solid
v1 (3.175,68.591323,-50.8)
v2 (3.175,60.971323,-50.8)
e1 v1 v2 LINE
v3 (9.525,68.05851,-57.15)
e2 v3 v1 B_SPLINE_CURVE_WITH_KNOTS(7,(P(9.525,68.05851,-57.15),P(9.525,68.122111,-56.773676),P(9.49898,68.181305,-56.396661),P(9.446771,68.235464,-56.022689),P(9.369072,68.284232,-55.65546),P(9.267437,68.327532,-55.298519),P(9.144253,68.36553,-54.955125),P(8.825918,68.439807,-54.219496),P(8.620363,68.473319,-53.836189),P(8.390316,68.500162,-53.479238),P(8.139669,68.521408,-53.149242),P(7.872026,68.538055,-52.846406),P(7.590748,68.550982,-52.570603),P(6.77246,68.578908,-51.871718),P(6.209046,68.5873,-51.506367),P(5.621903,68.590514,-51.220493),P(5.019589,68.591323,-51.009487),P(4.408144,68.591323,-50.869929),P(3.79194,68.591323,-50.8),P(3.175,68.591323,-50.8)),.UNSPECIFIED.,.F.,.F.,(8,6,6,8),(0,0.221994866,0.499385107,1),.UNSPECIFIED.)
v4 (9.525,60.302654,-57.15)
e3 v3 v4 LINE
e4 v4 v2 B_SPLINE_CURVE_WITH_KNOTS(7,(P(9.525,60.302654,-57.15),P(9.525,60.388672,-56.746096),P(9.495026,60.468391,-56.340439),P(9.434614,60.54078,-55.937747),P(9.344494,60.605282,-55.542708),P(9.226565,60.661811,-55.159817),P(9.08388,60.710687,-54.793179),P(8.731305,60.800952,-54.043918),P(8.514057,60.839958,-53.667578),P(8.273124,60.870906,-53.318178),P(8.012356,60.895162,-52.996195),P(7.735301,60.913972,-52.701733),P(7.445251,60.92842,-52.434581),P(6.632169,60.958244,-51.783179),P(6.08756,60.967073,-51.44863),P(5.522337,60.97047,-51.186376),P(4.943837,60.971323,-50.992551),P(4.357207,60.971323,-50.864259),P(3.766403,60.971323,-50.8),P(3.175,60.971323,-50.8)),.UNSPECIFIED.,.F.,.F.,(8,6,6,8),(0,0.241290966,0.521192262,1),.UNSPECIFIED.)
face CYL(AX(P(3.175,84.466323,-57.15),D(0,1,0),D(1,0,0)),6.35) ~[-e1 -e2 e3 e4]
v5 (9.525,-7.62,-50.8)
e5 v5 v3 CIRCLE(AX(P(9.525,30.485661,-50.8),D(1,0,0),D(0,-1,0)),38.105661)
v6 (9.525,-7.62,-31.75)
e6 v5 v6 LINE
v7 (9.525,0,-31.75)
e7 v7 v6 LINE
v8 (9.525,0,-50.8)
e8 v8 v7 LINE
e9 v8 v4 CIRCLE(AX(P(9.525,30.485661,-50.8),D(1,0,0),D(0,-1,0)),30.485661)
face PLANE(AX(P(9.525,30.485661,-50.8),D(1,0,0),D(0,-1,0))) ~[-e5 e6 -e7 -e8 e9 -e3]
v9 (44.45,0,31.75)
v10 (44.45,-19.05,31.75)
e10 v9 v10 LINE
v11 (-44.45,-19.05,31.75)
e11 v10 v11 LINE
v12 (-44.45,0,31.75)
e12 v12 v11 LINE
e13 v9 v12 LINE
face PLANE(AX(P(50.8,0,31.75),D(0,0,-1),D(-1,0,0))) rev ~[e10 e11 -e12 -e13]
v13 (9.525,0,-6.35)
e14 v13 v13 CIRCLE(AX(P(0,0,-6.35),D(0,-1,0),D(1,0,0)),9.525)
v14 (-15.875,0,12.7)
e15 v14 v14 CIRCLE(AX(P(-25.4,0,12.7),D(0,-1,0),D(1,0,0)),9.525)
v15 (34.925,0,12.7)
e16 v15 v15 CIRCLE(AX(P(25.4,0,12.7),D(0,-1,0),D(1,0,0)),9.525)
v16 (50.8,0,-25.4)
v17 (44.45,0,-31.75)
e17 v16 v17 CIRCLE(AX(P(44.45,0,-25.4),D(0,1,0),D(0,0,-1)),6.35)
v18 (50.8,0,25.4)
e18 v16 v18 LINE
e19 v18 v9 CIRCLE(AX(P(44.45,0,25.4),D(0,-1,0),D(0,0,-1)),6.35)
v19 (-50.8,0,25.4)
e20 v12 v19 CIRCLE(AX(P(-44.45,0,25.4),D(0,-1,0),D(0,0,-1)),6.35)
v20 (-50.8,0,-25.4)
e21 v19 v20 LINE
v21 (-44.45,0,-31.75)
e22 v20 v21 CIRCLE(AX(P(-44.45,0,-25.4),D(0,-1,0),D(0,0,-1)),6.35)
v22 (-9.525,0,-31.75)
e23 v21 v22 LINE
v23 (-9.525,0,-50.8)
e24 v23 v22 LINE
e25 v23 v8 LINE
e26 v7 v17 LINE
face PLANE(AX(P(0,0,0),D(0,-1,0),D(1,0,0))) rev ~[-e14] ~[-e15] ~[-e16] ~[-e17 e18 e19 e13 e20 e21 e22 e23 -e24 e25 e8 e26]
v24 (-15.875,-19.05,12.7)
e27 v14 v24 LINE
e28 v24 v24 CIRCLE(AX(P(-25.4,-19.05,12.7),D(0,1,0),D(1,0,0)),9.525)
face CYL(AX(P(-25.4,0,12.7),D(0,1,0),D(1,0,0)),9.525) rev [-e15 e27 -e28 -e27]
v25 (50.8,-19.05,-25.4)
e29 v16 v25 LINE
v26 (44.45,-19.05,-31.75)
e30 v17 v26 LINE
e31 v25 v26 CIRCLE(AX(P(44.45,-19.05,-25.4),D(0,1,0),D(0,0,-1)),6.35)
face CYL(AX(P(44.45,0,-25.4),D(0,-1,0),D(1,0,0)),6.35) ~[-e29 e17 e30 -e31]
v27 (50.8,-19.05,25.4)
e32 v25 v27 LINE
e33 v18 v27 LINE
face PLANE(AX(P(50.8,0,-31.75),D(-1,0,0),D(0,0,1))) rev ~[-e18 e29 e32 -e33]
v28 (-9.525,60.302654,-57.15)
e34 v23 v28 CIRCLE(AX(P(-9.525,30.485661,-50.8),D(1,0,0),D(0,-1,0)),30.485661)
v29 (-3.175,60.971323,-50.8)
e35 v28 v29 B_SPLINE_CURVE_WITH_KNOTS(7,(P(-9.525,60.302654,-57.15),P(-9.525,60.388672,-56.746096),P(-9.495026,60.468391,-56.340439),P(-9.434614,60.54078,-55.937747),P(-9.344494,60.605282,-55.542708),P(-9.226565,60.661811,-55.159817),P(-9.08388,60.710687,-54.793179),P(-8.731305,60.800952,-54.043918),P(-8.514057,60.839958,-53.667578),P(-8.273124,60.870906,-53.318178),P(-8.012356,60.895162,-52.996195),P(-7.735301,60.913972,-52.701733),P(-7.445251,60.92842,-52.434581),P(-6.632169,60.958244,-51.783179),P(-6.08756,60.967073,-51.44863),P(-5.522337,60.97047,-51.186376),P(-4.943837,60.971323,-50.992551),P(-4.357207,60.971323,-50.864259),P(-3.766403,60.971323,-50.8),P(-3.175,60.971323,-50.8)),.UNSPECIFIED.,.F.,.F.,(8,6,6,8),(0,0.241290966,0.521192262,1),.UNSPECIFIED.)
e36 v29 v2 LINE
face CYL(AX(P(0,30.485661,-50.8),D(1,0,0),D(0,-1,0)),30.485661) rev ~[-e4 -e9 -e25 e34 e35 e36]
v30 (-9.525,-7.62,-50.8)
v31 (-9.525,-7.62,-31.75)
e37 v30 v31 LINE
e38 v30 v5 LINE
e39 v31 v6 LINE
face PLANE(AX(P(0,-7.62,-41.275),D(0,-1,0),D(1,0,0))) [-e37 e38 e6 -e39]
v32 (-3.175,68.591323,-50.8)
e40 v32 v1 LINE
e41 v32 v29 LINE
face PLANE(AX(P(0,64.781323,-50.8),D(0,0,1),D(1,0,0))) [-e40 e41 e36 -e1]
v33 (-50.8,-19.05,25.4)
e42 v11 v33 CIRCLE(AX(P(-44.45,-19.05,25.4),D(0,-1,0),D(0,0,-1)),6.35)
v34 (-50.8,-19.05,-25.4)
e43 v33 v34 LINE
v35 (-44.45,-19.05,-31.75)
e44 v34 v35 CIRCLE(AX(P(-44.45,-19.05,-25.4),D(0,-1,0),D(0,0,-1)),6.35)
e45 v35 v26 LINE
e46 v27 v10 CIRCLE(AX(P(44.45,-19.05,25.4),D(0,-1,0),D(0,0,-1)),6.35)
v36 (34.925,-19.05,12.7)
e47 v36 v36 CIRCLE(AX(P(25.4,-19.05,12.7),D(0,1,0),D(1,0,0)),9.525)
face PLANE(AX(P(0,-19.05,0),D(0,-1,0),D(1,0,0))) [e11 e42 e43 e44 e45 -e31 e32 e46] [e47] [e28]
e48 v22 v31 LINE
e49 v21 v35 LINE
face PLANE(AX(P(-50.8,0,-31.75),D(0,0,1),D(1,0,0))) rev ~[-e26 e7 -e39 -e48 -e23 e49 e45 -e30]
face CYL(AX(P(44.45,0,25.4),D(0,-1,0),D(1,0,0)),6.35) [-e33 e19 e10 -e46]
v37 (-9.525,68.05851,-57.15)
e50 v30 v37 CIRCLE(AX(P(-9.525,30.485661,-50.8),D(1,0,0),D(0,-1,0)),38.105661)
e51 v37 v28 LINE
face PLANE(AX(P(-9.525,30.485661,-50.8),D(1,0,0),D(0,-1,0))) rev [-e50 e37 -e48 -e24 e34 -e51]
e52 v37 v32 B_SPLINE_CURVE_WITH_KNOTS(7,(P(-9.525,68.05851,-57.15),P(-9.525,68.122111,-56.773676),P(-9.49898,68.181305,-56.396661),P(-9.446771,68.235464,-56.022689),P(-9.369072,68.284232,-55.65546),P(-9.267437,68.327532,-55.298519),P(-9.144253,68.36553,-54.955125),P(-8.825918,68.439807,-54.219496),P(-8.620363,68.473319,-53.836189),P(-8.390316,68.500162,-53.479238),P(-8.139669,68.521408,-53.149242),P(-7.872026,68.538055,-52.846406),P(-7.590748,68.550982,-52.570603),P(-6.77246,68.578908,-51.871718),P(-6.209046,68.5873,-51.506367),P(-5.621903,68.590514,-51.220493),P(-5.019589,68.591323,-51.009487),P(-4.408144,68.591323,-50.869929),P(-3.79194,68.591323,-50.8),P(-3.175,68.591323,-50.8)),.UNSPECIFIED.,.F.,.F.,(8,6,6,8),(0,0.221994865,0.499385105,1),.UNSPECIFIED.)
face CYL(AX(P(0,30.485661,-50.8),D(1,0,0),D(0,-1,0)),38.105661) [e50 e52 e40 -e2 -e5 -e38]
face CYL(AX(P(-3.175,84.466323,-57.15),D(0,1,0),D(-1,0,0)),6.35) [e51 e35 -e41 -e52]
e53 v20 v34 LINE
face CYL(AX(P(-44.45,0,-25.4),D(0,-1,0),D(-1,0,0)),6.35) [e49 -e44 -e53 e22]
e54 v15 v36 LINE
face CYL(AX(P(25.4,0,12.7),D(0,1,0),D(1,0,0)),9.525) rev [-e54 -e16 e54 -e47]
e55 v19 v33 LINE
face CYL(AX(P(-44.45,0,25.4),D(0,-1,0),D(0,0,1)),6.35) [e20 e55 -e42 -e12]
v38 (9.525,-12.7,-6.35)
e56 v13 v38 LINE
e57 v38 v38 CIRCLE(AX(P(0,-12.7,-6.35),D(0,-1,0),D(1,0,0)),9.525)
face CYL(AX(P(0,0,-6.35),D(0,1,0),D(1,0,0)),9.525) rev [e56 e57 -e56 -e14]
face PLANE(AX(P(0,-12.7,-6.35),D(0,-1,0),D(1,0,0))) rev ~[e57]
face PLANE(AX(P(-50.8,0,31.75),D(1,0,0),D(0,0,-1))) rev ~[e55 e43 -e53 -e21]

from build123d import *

# Parameters (mm, degrees)
F1_DEPTH    = 19.05
F2_R        = 6.35
F0_W        = 19.05
F0_H        = 19.05
F3_DEPTH    = 7.62
F4_W        = 19.05
F4_H        = 7.62
F5_ANGLE    = 180
F6_T1_DEPTH = 39.37
F7_R        = 9.525
F8_DEPTH    = 19.051
F9_R        = 9.525
F10_DEPTH   = 12.7


# Not quite as in the source:
# - a fillet or chamfer that OpenCascade refuses, or shapes differently, is made with other operations: its cross-section is extruded or revolved along the edge and cut away or added


with BuildPart() as f1:
    # F0 (on Front) → F1 (new body)
    with BuildSketch(Plane.XZ):
        Polygon((50.8, -31.75), (50.8, 31.75), (-50.8, 31.75), (-50.8, -31.75), (-9.525, -31.75), (9.525, -31.75), align=None)
    extrude(amount=F1_DEPTH)

    # F2
    f2_edges = [f1.edges().sort_by_distance(p)[0] for p in [
        (50.8, -9.525, 31.75),
        (50.8, -9.525, -31.75),
        (-50.8, -9.525, -31.75),
        (-50.8, -9.525, 31.75),
    ]]
    fillet(f2_edges, radius=F2_R)

    # F0 (on Front) → F3 (join)
    with BuildSketch(Plane.XZ):
        with Locations((0, -41.275)):
            Rectangle(F0_W, F0_H)
    extrude(amount=F3_DEPTH)

    # F4 (on face) → F5 (revolve)
    with BuildSketch(Plane(origin=(0, 0, -50.8), x_dir=(1, 0, 0), z_dir=(0, 0, -1))):
        with Locations((0, 3.81)):
            Rectangle(F4_W, F4_H)
    revolve(axis=Axis((-4.1156476188, 30.4856614615, -50.8), (1, 0, 0)), revolution_arc=F5_ANGLE)

    # F6: fillet of radius 6.35 on 3 edges, made by hand

    # F6_s2 → F6_t1 (cut)
    with BuildSketch(Plane.XZ.offset(-84.4663229229)):
        with BuildLine():
            ThreePointArc((-9.525, -57.15), (-7.6651280605, -52.6598719395), (-3.175, -50.8))
            Line((-3.175, -50.8), (-9.525, -50.8))
            Line((-9.525, -50.8), (-9.525, -57.15))
        make_face()
        with BuildLine():
            ThreePointArc((9.525, -57.15), (7.6651280605, -52.6598719395), (3.175, -50.8))
            Line((3.175, -50.8), (9.525, -50.8))
            Line((9.525, -50.8), (9.525, -57.15))
        make_face()
    extrude(amount=F6_T1_DEPTH, mode=Mode.SUBTRACT)

    # F7 (on face) → F8 (cut, through all)
    with BuildSketch(Plane.XZ):
        with Locations((-25.4, 12.7)):
            Circle(F7_R)
        with Locations((25.4, 12.7)):
            Circle(F7_R)
    extrude(amount=F8_DEPTH, mode=Mode.SUBTRACT)

    # F9 (on face) → F10 (cut)
    with BuildSketch(Plane.XZ):
        with Locations((0, -6.35)):
            Circle(F9_R)
    extrude(amount=F10_DEPTH, mode=Mode.SUBTRACT)


solid = f1.part
